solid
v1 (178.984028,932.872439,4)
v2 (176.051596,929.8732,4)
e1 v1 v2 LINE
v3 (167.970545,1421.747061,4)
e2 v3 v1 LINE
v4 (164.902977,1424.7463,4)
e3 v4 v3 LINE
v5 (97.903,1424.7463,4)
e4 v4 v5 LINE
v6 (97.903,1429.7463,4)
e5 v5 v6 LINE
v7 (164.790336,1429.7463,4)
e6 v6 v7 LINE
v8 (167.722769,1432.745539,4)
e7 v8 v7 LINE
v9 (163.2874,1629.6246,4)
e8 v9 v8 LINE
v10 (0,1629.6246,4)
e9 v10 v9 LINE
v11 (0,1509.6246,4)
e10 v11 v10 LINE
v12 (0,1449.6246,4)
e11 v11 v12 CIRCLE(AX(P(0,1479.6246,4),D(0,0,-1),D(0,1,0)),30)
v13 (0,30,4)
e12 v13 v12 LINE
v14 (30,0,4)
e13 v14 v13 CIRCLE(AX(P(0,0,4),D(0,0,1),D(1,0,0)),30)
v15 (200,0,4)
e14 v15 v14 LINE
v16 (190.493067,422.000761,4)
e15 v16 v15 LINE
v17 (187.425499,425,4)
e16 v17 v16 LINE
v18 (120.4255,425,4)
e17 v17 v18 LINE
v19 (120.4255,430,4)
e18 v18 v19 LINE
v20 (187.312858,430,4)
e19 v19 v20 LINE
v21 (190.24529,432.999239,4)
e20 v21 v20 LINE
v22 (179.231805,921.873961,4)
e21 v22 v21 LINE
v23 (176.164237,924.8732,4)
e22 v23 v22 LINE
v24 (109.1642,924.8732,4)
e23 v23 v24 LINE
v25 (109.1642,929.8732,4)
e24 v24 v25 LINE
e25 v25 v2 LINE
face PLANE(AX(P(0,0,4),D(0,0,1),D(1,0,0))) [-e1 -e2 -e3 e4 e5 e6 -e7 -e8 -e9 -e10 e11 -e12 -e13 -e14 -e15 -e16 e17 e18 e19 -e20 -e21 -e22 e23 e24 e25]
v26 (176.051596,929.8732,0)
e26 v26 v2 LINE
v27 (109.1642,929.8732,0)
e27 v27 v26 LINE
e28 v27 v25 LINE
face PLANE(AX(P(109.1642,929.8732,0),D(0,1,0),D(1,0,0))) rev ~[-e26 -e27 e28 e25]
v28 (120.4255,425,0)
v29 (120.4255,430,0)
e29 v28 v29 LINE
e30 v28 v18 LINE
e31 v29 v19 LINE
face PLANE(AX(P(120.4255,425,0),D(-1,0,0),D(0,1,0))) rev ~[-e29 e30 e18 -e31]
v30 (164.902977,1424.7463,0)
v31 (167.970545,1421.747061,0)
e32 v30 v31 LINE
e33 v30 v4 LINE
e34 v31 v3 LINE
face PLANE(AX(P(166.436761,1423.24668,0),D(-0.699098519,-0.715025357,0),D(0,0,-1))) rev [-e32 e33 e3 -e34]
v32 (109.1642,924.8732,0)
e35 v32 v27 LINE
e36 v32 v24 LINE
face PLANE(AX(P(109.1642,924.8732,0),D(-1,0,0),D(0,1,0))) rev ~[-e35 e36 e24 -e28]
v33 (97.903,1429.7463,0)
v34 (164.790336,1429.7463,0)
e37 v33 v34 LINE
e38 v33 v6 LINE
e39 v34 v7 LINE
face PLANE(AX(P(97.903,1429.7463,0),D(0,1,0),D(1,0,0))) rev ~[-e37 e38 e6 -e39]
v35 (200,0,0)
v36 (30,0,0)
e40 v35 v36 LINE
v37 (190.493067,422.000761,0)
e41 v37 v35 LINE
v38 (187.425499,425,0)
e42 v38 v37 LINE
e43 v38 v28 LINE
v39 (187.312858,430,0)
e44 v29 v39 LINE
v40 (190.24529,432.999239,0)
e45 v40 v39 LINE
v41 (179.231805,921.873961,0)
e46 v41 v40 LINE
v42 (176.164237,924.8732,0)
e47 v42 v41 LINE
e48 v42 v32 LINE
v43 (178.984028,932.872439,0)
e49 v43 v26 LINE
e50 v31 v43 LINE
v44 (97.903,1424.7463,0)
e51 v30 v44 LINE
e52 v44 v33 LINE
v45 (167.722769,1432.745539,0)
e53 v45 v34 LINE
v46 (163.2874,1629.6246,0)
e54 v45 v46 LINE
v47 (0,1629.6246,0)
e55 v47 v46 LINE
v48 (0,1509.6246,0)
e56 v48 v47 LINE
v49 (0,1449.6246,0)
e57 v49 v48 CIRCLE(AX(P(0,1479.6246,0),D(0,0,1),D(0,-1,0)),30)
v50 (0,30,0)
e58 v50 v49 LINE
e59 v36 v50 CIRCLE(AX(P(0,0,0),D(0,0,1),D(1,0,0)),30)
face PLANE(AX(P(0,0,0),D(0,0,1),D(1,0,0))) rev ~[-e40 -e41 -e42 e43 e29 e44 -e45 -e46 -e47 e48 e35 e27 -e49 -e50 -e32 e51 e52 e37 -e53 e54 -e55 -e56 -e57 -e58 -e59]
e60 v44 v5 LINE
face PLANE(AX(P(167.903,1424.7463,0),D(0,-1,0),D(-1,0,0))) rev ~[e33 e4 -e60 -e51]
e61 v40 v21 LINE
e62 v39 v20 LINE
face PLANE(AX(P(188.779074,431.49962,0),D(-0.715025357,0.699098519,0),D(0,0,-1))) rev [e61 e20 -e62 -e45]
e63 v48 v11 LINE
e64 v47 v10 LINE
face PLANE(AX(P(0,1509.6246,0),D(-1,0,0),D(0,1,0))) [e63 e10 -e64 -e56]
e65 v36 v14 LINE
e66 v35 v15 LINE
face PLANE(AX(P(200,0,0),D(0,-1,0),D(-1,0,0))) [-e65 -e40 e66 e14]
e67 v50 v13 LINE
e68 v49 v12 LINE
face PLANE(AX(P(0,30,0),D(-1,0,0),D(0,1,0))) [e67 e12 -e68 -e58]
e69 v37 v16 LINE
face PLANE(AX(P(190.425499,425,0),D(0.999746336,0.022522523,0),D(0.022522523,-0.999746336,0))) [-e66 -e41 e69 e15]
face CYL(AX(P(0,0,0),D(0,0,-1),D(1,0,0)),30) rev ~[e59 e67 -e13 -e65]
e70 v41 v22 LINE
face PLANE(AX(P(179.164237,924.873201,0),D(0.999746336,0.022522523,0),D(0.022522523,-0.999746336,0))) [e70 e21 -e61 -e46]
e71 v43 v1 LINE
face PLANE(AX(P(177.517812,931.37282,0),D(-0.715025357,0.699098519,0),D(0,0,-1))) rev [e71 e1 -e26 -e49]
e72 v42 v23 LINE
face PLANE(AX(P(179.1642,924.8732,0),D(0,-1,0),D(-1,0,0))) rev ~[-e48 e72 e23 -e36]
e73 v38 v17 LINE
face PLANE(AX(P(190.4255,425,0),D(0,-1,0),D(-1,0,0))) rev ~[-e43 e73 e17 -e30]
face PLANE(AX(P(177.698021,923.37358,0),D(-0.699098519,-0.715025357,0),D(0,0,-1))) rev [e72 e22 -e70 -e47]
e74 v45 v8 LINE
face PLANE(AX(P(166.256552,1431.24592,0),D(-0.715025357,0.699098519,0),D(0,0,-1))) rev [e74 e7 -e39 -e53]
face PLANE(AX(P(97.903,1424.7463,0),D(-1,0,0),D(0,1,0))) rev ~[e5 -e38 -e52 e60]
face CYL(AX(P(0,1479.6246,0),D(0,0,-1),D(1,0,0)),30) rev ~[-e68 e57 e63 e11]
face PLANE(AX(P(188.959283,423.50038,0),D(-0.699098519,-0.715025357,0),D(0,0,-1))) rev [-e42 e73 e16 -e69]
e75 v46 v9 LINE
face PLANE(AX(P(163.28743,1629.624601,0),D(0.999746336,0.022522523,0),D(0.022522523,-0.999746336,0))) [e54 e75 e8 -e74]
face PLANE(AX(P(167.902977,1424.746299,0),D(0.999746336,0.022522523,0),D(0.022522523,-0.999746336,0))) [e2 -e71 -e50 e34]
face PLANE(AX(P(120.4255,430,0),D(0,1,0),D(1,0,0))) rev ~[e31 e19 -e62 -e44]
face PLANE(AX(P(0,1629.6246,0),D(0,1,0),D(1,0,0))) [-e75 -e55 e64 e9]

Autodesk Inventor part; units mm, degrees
ref_plane "YZ Plane" through (0, 0, 0) normal (1, 0, 0) x (0, 1, 0)
ref_plane "XZ Plane" through (0, 0, 0) normal (0, 1, 0) x (-1, 0, 0)
ref_plane "XY Plane" through (0, 0, 0) normal (0, 0, 1) x (1, 0, 0)
sketch "Sketch1" plane through (0, 0, 0) normal (0, 0, 1) x (1, 0, 0)
  line L0 (0, 0) -> (0, 4438.8737)
  line L1 (0, 4438.8737) -> (100, 4438.8737)
  line L2 (100, 4438.8737) -> (200, 0)
  line L3 (200, 0) -> (0, 0)
  circle A0 centre (0, 0) radius 30
  line L4 (0, 1479.6246) -> (166.6667, 1479.6246)
  line L5 (0, 2959.2492) -> (133.3333, 2959.2492)
  circle A1 centre (0, 1479.6246) radius 30
  circle A2 centre (0, 2959.2492) radius 30
  line L6 (190.4255, 425) -> (120.4255, 425)
  line L7 (120.4255, 425) -> (120.4255, 430)
  line L8 (120.4255, 430) -> (190.4255, 430)
  line L9 (190.4255, 430) -> (190.4255, 425)
  line L10 (109.1642, 929.8732) -> (179.1642, 929.8732)
  line L11 (179.1642, 924.8732) -> (109.1642, 924.8732)
  line L12 (109.1642, 924.8732) -> (109.1642, 929.8732)
  line L13 (179.1642, 929.8732) -> (179.1642, 924.8732)
  line L14 (97.903, 1429.7463) -> (167.903, 1429.7463)
  line L15 (167.903, 1424.7463) -> (97.903, 1424.7463)
  line L16 (97.903, 1424.7463) -> (97.903, 1429.7463)
  line L17 (167.903, 1429.7463) -> (167.903, 1424.7463)
  line L18 (86.6417, 1929.6195) -> (156.6417, 1929.6195)
  line L19 (156.6417, 1924.6195) -> (86.6417, 1924.6195)
  line L20 (86.6417, 1924.6195) -> (86.6417, 1929.6195)
  line L21 (156.6417, 1929.6195) -> (156.6417, 1924.6195)
  line L22 (75.3805, 2429.4927) -> (145.3805, 2429.4927)
  line L23 (145.3805, 2424.4927) -> (75.3805, 2424.4927)
  line L24 (75.3805, 2424.4927) -> (75.3805, 2429.4927)
  line L25 (145.3805, 2429.4927) -> (145.3805, 2424.4927)
  line L26 (64.1192, 2929.3658) -> (134.1192, 2929.3658)
  line L27 (134.1192, 2924.3658) -> (64.1192, 2924.3658)
  line L28 (64.1192, 2924.3658) -> (64.1192, 2929.3658)
  line L29 (134.1192, 2929.3658) -> (134.1192, 2924.3658)
  line L30 (52.8579, 3429.239) -> (122.8579, 3429.239)
  line L31 (122.8579, 3424.239) -> (52.8579, 3424.239)
  line L32 (52.8579, 3424.239) -> (52.8579, 3429.239)
  line L33 (122.8579, 3429.239) -> (122.8579, 3424.239)
  line L34 (41.5967, 3929.1122) -> (111.5967, 3929.1122)
  line L35 (111.5967, 3924.1122) -> (41.5967, 3924.1122)
  line L36 (41.5967, 3924.1122) -> (41.5967, 3929.1122)
  line L37 (111.5967, 3929.1122) -> (111.5967, 3924.1122)
  line L38 (0, 1629.6246) -> (163.2874, 1629.6246)
  line L39 (0, 3039.2492) -> (131.5311, 3039.2492)
  point P0 (30, 2959.2492)
  point P1 (0, 2929.2492)
  point P2 (0, 1509.6246)
  point P3 (0, 1449.6246)
  point P4 (0, 30)
  point P5 (30, 0)
  point P6 (190.3129, 430)
  point P7 (179.0516, 929.8732)
  point P8 (167.7903, 1429.7463)
  point P9 (30, 1479.6246)
  dimension "d65" = 100
  dimension "d67" = 200
  dimension "d68" = 60
  dimension "d69" = 1480
  dimension "d70" = 1480
  dimension "d71" = 1480
  dimension "d72" = 5
  dimension "d73" = 70
  dimension "d74" = 430
  dimension "d77" = 500
  dimension "d82" = 80
  dimension "d83" = 150
extrude "Plate3" add sketch "Sketch1" along normal blind 4 contours L38 L2 L4 A1 L0 | L4 L2 L14 L16 L15 L10 L12 L11 L8 L7 L6 L3 A0 L0 A1
chamfer "Corner Chamfer2" distance 3 angle 45 6 edges at (190.3129, 430, 2) (190.4255, 425, 2) (179.1642, 924.8732, 2) (179.0516, 929.8732, 2) (167.903, 1424.7463, 2) (167.7903, 1429.7463, 2)
equation "\"BendRadius\" = Thickness"
equation "\"BendReliefWidth\" = Thickness"
equation "\"BendReliefDepth\" = 0.5 * Thickness"
equation "\"CornerReliefSize\" = 4 * Thickness"
equation "\"MinimumRemnant\" = 2 * Thickness"
equation "\"TransitionRadius\" = BendRadius"
equation "\"JacobiRadiusSize\" = BendRadius"
equation "\"GapSize\" = Thickness"
equation "\"Thickness\" = 4"
properties part number "GBK 3101 Center main rib" material "Steel"
